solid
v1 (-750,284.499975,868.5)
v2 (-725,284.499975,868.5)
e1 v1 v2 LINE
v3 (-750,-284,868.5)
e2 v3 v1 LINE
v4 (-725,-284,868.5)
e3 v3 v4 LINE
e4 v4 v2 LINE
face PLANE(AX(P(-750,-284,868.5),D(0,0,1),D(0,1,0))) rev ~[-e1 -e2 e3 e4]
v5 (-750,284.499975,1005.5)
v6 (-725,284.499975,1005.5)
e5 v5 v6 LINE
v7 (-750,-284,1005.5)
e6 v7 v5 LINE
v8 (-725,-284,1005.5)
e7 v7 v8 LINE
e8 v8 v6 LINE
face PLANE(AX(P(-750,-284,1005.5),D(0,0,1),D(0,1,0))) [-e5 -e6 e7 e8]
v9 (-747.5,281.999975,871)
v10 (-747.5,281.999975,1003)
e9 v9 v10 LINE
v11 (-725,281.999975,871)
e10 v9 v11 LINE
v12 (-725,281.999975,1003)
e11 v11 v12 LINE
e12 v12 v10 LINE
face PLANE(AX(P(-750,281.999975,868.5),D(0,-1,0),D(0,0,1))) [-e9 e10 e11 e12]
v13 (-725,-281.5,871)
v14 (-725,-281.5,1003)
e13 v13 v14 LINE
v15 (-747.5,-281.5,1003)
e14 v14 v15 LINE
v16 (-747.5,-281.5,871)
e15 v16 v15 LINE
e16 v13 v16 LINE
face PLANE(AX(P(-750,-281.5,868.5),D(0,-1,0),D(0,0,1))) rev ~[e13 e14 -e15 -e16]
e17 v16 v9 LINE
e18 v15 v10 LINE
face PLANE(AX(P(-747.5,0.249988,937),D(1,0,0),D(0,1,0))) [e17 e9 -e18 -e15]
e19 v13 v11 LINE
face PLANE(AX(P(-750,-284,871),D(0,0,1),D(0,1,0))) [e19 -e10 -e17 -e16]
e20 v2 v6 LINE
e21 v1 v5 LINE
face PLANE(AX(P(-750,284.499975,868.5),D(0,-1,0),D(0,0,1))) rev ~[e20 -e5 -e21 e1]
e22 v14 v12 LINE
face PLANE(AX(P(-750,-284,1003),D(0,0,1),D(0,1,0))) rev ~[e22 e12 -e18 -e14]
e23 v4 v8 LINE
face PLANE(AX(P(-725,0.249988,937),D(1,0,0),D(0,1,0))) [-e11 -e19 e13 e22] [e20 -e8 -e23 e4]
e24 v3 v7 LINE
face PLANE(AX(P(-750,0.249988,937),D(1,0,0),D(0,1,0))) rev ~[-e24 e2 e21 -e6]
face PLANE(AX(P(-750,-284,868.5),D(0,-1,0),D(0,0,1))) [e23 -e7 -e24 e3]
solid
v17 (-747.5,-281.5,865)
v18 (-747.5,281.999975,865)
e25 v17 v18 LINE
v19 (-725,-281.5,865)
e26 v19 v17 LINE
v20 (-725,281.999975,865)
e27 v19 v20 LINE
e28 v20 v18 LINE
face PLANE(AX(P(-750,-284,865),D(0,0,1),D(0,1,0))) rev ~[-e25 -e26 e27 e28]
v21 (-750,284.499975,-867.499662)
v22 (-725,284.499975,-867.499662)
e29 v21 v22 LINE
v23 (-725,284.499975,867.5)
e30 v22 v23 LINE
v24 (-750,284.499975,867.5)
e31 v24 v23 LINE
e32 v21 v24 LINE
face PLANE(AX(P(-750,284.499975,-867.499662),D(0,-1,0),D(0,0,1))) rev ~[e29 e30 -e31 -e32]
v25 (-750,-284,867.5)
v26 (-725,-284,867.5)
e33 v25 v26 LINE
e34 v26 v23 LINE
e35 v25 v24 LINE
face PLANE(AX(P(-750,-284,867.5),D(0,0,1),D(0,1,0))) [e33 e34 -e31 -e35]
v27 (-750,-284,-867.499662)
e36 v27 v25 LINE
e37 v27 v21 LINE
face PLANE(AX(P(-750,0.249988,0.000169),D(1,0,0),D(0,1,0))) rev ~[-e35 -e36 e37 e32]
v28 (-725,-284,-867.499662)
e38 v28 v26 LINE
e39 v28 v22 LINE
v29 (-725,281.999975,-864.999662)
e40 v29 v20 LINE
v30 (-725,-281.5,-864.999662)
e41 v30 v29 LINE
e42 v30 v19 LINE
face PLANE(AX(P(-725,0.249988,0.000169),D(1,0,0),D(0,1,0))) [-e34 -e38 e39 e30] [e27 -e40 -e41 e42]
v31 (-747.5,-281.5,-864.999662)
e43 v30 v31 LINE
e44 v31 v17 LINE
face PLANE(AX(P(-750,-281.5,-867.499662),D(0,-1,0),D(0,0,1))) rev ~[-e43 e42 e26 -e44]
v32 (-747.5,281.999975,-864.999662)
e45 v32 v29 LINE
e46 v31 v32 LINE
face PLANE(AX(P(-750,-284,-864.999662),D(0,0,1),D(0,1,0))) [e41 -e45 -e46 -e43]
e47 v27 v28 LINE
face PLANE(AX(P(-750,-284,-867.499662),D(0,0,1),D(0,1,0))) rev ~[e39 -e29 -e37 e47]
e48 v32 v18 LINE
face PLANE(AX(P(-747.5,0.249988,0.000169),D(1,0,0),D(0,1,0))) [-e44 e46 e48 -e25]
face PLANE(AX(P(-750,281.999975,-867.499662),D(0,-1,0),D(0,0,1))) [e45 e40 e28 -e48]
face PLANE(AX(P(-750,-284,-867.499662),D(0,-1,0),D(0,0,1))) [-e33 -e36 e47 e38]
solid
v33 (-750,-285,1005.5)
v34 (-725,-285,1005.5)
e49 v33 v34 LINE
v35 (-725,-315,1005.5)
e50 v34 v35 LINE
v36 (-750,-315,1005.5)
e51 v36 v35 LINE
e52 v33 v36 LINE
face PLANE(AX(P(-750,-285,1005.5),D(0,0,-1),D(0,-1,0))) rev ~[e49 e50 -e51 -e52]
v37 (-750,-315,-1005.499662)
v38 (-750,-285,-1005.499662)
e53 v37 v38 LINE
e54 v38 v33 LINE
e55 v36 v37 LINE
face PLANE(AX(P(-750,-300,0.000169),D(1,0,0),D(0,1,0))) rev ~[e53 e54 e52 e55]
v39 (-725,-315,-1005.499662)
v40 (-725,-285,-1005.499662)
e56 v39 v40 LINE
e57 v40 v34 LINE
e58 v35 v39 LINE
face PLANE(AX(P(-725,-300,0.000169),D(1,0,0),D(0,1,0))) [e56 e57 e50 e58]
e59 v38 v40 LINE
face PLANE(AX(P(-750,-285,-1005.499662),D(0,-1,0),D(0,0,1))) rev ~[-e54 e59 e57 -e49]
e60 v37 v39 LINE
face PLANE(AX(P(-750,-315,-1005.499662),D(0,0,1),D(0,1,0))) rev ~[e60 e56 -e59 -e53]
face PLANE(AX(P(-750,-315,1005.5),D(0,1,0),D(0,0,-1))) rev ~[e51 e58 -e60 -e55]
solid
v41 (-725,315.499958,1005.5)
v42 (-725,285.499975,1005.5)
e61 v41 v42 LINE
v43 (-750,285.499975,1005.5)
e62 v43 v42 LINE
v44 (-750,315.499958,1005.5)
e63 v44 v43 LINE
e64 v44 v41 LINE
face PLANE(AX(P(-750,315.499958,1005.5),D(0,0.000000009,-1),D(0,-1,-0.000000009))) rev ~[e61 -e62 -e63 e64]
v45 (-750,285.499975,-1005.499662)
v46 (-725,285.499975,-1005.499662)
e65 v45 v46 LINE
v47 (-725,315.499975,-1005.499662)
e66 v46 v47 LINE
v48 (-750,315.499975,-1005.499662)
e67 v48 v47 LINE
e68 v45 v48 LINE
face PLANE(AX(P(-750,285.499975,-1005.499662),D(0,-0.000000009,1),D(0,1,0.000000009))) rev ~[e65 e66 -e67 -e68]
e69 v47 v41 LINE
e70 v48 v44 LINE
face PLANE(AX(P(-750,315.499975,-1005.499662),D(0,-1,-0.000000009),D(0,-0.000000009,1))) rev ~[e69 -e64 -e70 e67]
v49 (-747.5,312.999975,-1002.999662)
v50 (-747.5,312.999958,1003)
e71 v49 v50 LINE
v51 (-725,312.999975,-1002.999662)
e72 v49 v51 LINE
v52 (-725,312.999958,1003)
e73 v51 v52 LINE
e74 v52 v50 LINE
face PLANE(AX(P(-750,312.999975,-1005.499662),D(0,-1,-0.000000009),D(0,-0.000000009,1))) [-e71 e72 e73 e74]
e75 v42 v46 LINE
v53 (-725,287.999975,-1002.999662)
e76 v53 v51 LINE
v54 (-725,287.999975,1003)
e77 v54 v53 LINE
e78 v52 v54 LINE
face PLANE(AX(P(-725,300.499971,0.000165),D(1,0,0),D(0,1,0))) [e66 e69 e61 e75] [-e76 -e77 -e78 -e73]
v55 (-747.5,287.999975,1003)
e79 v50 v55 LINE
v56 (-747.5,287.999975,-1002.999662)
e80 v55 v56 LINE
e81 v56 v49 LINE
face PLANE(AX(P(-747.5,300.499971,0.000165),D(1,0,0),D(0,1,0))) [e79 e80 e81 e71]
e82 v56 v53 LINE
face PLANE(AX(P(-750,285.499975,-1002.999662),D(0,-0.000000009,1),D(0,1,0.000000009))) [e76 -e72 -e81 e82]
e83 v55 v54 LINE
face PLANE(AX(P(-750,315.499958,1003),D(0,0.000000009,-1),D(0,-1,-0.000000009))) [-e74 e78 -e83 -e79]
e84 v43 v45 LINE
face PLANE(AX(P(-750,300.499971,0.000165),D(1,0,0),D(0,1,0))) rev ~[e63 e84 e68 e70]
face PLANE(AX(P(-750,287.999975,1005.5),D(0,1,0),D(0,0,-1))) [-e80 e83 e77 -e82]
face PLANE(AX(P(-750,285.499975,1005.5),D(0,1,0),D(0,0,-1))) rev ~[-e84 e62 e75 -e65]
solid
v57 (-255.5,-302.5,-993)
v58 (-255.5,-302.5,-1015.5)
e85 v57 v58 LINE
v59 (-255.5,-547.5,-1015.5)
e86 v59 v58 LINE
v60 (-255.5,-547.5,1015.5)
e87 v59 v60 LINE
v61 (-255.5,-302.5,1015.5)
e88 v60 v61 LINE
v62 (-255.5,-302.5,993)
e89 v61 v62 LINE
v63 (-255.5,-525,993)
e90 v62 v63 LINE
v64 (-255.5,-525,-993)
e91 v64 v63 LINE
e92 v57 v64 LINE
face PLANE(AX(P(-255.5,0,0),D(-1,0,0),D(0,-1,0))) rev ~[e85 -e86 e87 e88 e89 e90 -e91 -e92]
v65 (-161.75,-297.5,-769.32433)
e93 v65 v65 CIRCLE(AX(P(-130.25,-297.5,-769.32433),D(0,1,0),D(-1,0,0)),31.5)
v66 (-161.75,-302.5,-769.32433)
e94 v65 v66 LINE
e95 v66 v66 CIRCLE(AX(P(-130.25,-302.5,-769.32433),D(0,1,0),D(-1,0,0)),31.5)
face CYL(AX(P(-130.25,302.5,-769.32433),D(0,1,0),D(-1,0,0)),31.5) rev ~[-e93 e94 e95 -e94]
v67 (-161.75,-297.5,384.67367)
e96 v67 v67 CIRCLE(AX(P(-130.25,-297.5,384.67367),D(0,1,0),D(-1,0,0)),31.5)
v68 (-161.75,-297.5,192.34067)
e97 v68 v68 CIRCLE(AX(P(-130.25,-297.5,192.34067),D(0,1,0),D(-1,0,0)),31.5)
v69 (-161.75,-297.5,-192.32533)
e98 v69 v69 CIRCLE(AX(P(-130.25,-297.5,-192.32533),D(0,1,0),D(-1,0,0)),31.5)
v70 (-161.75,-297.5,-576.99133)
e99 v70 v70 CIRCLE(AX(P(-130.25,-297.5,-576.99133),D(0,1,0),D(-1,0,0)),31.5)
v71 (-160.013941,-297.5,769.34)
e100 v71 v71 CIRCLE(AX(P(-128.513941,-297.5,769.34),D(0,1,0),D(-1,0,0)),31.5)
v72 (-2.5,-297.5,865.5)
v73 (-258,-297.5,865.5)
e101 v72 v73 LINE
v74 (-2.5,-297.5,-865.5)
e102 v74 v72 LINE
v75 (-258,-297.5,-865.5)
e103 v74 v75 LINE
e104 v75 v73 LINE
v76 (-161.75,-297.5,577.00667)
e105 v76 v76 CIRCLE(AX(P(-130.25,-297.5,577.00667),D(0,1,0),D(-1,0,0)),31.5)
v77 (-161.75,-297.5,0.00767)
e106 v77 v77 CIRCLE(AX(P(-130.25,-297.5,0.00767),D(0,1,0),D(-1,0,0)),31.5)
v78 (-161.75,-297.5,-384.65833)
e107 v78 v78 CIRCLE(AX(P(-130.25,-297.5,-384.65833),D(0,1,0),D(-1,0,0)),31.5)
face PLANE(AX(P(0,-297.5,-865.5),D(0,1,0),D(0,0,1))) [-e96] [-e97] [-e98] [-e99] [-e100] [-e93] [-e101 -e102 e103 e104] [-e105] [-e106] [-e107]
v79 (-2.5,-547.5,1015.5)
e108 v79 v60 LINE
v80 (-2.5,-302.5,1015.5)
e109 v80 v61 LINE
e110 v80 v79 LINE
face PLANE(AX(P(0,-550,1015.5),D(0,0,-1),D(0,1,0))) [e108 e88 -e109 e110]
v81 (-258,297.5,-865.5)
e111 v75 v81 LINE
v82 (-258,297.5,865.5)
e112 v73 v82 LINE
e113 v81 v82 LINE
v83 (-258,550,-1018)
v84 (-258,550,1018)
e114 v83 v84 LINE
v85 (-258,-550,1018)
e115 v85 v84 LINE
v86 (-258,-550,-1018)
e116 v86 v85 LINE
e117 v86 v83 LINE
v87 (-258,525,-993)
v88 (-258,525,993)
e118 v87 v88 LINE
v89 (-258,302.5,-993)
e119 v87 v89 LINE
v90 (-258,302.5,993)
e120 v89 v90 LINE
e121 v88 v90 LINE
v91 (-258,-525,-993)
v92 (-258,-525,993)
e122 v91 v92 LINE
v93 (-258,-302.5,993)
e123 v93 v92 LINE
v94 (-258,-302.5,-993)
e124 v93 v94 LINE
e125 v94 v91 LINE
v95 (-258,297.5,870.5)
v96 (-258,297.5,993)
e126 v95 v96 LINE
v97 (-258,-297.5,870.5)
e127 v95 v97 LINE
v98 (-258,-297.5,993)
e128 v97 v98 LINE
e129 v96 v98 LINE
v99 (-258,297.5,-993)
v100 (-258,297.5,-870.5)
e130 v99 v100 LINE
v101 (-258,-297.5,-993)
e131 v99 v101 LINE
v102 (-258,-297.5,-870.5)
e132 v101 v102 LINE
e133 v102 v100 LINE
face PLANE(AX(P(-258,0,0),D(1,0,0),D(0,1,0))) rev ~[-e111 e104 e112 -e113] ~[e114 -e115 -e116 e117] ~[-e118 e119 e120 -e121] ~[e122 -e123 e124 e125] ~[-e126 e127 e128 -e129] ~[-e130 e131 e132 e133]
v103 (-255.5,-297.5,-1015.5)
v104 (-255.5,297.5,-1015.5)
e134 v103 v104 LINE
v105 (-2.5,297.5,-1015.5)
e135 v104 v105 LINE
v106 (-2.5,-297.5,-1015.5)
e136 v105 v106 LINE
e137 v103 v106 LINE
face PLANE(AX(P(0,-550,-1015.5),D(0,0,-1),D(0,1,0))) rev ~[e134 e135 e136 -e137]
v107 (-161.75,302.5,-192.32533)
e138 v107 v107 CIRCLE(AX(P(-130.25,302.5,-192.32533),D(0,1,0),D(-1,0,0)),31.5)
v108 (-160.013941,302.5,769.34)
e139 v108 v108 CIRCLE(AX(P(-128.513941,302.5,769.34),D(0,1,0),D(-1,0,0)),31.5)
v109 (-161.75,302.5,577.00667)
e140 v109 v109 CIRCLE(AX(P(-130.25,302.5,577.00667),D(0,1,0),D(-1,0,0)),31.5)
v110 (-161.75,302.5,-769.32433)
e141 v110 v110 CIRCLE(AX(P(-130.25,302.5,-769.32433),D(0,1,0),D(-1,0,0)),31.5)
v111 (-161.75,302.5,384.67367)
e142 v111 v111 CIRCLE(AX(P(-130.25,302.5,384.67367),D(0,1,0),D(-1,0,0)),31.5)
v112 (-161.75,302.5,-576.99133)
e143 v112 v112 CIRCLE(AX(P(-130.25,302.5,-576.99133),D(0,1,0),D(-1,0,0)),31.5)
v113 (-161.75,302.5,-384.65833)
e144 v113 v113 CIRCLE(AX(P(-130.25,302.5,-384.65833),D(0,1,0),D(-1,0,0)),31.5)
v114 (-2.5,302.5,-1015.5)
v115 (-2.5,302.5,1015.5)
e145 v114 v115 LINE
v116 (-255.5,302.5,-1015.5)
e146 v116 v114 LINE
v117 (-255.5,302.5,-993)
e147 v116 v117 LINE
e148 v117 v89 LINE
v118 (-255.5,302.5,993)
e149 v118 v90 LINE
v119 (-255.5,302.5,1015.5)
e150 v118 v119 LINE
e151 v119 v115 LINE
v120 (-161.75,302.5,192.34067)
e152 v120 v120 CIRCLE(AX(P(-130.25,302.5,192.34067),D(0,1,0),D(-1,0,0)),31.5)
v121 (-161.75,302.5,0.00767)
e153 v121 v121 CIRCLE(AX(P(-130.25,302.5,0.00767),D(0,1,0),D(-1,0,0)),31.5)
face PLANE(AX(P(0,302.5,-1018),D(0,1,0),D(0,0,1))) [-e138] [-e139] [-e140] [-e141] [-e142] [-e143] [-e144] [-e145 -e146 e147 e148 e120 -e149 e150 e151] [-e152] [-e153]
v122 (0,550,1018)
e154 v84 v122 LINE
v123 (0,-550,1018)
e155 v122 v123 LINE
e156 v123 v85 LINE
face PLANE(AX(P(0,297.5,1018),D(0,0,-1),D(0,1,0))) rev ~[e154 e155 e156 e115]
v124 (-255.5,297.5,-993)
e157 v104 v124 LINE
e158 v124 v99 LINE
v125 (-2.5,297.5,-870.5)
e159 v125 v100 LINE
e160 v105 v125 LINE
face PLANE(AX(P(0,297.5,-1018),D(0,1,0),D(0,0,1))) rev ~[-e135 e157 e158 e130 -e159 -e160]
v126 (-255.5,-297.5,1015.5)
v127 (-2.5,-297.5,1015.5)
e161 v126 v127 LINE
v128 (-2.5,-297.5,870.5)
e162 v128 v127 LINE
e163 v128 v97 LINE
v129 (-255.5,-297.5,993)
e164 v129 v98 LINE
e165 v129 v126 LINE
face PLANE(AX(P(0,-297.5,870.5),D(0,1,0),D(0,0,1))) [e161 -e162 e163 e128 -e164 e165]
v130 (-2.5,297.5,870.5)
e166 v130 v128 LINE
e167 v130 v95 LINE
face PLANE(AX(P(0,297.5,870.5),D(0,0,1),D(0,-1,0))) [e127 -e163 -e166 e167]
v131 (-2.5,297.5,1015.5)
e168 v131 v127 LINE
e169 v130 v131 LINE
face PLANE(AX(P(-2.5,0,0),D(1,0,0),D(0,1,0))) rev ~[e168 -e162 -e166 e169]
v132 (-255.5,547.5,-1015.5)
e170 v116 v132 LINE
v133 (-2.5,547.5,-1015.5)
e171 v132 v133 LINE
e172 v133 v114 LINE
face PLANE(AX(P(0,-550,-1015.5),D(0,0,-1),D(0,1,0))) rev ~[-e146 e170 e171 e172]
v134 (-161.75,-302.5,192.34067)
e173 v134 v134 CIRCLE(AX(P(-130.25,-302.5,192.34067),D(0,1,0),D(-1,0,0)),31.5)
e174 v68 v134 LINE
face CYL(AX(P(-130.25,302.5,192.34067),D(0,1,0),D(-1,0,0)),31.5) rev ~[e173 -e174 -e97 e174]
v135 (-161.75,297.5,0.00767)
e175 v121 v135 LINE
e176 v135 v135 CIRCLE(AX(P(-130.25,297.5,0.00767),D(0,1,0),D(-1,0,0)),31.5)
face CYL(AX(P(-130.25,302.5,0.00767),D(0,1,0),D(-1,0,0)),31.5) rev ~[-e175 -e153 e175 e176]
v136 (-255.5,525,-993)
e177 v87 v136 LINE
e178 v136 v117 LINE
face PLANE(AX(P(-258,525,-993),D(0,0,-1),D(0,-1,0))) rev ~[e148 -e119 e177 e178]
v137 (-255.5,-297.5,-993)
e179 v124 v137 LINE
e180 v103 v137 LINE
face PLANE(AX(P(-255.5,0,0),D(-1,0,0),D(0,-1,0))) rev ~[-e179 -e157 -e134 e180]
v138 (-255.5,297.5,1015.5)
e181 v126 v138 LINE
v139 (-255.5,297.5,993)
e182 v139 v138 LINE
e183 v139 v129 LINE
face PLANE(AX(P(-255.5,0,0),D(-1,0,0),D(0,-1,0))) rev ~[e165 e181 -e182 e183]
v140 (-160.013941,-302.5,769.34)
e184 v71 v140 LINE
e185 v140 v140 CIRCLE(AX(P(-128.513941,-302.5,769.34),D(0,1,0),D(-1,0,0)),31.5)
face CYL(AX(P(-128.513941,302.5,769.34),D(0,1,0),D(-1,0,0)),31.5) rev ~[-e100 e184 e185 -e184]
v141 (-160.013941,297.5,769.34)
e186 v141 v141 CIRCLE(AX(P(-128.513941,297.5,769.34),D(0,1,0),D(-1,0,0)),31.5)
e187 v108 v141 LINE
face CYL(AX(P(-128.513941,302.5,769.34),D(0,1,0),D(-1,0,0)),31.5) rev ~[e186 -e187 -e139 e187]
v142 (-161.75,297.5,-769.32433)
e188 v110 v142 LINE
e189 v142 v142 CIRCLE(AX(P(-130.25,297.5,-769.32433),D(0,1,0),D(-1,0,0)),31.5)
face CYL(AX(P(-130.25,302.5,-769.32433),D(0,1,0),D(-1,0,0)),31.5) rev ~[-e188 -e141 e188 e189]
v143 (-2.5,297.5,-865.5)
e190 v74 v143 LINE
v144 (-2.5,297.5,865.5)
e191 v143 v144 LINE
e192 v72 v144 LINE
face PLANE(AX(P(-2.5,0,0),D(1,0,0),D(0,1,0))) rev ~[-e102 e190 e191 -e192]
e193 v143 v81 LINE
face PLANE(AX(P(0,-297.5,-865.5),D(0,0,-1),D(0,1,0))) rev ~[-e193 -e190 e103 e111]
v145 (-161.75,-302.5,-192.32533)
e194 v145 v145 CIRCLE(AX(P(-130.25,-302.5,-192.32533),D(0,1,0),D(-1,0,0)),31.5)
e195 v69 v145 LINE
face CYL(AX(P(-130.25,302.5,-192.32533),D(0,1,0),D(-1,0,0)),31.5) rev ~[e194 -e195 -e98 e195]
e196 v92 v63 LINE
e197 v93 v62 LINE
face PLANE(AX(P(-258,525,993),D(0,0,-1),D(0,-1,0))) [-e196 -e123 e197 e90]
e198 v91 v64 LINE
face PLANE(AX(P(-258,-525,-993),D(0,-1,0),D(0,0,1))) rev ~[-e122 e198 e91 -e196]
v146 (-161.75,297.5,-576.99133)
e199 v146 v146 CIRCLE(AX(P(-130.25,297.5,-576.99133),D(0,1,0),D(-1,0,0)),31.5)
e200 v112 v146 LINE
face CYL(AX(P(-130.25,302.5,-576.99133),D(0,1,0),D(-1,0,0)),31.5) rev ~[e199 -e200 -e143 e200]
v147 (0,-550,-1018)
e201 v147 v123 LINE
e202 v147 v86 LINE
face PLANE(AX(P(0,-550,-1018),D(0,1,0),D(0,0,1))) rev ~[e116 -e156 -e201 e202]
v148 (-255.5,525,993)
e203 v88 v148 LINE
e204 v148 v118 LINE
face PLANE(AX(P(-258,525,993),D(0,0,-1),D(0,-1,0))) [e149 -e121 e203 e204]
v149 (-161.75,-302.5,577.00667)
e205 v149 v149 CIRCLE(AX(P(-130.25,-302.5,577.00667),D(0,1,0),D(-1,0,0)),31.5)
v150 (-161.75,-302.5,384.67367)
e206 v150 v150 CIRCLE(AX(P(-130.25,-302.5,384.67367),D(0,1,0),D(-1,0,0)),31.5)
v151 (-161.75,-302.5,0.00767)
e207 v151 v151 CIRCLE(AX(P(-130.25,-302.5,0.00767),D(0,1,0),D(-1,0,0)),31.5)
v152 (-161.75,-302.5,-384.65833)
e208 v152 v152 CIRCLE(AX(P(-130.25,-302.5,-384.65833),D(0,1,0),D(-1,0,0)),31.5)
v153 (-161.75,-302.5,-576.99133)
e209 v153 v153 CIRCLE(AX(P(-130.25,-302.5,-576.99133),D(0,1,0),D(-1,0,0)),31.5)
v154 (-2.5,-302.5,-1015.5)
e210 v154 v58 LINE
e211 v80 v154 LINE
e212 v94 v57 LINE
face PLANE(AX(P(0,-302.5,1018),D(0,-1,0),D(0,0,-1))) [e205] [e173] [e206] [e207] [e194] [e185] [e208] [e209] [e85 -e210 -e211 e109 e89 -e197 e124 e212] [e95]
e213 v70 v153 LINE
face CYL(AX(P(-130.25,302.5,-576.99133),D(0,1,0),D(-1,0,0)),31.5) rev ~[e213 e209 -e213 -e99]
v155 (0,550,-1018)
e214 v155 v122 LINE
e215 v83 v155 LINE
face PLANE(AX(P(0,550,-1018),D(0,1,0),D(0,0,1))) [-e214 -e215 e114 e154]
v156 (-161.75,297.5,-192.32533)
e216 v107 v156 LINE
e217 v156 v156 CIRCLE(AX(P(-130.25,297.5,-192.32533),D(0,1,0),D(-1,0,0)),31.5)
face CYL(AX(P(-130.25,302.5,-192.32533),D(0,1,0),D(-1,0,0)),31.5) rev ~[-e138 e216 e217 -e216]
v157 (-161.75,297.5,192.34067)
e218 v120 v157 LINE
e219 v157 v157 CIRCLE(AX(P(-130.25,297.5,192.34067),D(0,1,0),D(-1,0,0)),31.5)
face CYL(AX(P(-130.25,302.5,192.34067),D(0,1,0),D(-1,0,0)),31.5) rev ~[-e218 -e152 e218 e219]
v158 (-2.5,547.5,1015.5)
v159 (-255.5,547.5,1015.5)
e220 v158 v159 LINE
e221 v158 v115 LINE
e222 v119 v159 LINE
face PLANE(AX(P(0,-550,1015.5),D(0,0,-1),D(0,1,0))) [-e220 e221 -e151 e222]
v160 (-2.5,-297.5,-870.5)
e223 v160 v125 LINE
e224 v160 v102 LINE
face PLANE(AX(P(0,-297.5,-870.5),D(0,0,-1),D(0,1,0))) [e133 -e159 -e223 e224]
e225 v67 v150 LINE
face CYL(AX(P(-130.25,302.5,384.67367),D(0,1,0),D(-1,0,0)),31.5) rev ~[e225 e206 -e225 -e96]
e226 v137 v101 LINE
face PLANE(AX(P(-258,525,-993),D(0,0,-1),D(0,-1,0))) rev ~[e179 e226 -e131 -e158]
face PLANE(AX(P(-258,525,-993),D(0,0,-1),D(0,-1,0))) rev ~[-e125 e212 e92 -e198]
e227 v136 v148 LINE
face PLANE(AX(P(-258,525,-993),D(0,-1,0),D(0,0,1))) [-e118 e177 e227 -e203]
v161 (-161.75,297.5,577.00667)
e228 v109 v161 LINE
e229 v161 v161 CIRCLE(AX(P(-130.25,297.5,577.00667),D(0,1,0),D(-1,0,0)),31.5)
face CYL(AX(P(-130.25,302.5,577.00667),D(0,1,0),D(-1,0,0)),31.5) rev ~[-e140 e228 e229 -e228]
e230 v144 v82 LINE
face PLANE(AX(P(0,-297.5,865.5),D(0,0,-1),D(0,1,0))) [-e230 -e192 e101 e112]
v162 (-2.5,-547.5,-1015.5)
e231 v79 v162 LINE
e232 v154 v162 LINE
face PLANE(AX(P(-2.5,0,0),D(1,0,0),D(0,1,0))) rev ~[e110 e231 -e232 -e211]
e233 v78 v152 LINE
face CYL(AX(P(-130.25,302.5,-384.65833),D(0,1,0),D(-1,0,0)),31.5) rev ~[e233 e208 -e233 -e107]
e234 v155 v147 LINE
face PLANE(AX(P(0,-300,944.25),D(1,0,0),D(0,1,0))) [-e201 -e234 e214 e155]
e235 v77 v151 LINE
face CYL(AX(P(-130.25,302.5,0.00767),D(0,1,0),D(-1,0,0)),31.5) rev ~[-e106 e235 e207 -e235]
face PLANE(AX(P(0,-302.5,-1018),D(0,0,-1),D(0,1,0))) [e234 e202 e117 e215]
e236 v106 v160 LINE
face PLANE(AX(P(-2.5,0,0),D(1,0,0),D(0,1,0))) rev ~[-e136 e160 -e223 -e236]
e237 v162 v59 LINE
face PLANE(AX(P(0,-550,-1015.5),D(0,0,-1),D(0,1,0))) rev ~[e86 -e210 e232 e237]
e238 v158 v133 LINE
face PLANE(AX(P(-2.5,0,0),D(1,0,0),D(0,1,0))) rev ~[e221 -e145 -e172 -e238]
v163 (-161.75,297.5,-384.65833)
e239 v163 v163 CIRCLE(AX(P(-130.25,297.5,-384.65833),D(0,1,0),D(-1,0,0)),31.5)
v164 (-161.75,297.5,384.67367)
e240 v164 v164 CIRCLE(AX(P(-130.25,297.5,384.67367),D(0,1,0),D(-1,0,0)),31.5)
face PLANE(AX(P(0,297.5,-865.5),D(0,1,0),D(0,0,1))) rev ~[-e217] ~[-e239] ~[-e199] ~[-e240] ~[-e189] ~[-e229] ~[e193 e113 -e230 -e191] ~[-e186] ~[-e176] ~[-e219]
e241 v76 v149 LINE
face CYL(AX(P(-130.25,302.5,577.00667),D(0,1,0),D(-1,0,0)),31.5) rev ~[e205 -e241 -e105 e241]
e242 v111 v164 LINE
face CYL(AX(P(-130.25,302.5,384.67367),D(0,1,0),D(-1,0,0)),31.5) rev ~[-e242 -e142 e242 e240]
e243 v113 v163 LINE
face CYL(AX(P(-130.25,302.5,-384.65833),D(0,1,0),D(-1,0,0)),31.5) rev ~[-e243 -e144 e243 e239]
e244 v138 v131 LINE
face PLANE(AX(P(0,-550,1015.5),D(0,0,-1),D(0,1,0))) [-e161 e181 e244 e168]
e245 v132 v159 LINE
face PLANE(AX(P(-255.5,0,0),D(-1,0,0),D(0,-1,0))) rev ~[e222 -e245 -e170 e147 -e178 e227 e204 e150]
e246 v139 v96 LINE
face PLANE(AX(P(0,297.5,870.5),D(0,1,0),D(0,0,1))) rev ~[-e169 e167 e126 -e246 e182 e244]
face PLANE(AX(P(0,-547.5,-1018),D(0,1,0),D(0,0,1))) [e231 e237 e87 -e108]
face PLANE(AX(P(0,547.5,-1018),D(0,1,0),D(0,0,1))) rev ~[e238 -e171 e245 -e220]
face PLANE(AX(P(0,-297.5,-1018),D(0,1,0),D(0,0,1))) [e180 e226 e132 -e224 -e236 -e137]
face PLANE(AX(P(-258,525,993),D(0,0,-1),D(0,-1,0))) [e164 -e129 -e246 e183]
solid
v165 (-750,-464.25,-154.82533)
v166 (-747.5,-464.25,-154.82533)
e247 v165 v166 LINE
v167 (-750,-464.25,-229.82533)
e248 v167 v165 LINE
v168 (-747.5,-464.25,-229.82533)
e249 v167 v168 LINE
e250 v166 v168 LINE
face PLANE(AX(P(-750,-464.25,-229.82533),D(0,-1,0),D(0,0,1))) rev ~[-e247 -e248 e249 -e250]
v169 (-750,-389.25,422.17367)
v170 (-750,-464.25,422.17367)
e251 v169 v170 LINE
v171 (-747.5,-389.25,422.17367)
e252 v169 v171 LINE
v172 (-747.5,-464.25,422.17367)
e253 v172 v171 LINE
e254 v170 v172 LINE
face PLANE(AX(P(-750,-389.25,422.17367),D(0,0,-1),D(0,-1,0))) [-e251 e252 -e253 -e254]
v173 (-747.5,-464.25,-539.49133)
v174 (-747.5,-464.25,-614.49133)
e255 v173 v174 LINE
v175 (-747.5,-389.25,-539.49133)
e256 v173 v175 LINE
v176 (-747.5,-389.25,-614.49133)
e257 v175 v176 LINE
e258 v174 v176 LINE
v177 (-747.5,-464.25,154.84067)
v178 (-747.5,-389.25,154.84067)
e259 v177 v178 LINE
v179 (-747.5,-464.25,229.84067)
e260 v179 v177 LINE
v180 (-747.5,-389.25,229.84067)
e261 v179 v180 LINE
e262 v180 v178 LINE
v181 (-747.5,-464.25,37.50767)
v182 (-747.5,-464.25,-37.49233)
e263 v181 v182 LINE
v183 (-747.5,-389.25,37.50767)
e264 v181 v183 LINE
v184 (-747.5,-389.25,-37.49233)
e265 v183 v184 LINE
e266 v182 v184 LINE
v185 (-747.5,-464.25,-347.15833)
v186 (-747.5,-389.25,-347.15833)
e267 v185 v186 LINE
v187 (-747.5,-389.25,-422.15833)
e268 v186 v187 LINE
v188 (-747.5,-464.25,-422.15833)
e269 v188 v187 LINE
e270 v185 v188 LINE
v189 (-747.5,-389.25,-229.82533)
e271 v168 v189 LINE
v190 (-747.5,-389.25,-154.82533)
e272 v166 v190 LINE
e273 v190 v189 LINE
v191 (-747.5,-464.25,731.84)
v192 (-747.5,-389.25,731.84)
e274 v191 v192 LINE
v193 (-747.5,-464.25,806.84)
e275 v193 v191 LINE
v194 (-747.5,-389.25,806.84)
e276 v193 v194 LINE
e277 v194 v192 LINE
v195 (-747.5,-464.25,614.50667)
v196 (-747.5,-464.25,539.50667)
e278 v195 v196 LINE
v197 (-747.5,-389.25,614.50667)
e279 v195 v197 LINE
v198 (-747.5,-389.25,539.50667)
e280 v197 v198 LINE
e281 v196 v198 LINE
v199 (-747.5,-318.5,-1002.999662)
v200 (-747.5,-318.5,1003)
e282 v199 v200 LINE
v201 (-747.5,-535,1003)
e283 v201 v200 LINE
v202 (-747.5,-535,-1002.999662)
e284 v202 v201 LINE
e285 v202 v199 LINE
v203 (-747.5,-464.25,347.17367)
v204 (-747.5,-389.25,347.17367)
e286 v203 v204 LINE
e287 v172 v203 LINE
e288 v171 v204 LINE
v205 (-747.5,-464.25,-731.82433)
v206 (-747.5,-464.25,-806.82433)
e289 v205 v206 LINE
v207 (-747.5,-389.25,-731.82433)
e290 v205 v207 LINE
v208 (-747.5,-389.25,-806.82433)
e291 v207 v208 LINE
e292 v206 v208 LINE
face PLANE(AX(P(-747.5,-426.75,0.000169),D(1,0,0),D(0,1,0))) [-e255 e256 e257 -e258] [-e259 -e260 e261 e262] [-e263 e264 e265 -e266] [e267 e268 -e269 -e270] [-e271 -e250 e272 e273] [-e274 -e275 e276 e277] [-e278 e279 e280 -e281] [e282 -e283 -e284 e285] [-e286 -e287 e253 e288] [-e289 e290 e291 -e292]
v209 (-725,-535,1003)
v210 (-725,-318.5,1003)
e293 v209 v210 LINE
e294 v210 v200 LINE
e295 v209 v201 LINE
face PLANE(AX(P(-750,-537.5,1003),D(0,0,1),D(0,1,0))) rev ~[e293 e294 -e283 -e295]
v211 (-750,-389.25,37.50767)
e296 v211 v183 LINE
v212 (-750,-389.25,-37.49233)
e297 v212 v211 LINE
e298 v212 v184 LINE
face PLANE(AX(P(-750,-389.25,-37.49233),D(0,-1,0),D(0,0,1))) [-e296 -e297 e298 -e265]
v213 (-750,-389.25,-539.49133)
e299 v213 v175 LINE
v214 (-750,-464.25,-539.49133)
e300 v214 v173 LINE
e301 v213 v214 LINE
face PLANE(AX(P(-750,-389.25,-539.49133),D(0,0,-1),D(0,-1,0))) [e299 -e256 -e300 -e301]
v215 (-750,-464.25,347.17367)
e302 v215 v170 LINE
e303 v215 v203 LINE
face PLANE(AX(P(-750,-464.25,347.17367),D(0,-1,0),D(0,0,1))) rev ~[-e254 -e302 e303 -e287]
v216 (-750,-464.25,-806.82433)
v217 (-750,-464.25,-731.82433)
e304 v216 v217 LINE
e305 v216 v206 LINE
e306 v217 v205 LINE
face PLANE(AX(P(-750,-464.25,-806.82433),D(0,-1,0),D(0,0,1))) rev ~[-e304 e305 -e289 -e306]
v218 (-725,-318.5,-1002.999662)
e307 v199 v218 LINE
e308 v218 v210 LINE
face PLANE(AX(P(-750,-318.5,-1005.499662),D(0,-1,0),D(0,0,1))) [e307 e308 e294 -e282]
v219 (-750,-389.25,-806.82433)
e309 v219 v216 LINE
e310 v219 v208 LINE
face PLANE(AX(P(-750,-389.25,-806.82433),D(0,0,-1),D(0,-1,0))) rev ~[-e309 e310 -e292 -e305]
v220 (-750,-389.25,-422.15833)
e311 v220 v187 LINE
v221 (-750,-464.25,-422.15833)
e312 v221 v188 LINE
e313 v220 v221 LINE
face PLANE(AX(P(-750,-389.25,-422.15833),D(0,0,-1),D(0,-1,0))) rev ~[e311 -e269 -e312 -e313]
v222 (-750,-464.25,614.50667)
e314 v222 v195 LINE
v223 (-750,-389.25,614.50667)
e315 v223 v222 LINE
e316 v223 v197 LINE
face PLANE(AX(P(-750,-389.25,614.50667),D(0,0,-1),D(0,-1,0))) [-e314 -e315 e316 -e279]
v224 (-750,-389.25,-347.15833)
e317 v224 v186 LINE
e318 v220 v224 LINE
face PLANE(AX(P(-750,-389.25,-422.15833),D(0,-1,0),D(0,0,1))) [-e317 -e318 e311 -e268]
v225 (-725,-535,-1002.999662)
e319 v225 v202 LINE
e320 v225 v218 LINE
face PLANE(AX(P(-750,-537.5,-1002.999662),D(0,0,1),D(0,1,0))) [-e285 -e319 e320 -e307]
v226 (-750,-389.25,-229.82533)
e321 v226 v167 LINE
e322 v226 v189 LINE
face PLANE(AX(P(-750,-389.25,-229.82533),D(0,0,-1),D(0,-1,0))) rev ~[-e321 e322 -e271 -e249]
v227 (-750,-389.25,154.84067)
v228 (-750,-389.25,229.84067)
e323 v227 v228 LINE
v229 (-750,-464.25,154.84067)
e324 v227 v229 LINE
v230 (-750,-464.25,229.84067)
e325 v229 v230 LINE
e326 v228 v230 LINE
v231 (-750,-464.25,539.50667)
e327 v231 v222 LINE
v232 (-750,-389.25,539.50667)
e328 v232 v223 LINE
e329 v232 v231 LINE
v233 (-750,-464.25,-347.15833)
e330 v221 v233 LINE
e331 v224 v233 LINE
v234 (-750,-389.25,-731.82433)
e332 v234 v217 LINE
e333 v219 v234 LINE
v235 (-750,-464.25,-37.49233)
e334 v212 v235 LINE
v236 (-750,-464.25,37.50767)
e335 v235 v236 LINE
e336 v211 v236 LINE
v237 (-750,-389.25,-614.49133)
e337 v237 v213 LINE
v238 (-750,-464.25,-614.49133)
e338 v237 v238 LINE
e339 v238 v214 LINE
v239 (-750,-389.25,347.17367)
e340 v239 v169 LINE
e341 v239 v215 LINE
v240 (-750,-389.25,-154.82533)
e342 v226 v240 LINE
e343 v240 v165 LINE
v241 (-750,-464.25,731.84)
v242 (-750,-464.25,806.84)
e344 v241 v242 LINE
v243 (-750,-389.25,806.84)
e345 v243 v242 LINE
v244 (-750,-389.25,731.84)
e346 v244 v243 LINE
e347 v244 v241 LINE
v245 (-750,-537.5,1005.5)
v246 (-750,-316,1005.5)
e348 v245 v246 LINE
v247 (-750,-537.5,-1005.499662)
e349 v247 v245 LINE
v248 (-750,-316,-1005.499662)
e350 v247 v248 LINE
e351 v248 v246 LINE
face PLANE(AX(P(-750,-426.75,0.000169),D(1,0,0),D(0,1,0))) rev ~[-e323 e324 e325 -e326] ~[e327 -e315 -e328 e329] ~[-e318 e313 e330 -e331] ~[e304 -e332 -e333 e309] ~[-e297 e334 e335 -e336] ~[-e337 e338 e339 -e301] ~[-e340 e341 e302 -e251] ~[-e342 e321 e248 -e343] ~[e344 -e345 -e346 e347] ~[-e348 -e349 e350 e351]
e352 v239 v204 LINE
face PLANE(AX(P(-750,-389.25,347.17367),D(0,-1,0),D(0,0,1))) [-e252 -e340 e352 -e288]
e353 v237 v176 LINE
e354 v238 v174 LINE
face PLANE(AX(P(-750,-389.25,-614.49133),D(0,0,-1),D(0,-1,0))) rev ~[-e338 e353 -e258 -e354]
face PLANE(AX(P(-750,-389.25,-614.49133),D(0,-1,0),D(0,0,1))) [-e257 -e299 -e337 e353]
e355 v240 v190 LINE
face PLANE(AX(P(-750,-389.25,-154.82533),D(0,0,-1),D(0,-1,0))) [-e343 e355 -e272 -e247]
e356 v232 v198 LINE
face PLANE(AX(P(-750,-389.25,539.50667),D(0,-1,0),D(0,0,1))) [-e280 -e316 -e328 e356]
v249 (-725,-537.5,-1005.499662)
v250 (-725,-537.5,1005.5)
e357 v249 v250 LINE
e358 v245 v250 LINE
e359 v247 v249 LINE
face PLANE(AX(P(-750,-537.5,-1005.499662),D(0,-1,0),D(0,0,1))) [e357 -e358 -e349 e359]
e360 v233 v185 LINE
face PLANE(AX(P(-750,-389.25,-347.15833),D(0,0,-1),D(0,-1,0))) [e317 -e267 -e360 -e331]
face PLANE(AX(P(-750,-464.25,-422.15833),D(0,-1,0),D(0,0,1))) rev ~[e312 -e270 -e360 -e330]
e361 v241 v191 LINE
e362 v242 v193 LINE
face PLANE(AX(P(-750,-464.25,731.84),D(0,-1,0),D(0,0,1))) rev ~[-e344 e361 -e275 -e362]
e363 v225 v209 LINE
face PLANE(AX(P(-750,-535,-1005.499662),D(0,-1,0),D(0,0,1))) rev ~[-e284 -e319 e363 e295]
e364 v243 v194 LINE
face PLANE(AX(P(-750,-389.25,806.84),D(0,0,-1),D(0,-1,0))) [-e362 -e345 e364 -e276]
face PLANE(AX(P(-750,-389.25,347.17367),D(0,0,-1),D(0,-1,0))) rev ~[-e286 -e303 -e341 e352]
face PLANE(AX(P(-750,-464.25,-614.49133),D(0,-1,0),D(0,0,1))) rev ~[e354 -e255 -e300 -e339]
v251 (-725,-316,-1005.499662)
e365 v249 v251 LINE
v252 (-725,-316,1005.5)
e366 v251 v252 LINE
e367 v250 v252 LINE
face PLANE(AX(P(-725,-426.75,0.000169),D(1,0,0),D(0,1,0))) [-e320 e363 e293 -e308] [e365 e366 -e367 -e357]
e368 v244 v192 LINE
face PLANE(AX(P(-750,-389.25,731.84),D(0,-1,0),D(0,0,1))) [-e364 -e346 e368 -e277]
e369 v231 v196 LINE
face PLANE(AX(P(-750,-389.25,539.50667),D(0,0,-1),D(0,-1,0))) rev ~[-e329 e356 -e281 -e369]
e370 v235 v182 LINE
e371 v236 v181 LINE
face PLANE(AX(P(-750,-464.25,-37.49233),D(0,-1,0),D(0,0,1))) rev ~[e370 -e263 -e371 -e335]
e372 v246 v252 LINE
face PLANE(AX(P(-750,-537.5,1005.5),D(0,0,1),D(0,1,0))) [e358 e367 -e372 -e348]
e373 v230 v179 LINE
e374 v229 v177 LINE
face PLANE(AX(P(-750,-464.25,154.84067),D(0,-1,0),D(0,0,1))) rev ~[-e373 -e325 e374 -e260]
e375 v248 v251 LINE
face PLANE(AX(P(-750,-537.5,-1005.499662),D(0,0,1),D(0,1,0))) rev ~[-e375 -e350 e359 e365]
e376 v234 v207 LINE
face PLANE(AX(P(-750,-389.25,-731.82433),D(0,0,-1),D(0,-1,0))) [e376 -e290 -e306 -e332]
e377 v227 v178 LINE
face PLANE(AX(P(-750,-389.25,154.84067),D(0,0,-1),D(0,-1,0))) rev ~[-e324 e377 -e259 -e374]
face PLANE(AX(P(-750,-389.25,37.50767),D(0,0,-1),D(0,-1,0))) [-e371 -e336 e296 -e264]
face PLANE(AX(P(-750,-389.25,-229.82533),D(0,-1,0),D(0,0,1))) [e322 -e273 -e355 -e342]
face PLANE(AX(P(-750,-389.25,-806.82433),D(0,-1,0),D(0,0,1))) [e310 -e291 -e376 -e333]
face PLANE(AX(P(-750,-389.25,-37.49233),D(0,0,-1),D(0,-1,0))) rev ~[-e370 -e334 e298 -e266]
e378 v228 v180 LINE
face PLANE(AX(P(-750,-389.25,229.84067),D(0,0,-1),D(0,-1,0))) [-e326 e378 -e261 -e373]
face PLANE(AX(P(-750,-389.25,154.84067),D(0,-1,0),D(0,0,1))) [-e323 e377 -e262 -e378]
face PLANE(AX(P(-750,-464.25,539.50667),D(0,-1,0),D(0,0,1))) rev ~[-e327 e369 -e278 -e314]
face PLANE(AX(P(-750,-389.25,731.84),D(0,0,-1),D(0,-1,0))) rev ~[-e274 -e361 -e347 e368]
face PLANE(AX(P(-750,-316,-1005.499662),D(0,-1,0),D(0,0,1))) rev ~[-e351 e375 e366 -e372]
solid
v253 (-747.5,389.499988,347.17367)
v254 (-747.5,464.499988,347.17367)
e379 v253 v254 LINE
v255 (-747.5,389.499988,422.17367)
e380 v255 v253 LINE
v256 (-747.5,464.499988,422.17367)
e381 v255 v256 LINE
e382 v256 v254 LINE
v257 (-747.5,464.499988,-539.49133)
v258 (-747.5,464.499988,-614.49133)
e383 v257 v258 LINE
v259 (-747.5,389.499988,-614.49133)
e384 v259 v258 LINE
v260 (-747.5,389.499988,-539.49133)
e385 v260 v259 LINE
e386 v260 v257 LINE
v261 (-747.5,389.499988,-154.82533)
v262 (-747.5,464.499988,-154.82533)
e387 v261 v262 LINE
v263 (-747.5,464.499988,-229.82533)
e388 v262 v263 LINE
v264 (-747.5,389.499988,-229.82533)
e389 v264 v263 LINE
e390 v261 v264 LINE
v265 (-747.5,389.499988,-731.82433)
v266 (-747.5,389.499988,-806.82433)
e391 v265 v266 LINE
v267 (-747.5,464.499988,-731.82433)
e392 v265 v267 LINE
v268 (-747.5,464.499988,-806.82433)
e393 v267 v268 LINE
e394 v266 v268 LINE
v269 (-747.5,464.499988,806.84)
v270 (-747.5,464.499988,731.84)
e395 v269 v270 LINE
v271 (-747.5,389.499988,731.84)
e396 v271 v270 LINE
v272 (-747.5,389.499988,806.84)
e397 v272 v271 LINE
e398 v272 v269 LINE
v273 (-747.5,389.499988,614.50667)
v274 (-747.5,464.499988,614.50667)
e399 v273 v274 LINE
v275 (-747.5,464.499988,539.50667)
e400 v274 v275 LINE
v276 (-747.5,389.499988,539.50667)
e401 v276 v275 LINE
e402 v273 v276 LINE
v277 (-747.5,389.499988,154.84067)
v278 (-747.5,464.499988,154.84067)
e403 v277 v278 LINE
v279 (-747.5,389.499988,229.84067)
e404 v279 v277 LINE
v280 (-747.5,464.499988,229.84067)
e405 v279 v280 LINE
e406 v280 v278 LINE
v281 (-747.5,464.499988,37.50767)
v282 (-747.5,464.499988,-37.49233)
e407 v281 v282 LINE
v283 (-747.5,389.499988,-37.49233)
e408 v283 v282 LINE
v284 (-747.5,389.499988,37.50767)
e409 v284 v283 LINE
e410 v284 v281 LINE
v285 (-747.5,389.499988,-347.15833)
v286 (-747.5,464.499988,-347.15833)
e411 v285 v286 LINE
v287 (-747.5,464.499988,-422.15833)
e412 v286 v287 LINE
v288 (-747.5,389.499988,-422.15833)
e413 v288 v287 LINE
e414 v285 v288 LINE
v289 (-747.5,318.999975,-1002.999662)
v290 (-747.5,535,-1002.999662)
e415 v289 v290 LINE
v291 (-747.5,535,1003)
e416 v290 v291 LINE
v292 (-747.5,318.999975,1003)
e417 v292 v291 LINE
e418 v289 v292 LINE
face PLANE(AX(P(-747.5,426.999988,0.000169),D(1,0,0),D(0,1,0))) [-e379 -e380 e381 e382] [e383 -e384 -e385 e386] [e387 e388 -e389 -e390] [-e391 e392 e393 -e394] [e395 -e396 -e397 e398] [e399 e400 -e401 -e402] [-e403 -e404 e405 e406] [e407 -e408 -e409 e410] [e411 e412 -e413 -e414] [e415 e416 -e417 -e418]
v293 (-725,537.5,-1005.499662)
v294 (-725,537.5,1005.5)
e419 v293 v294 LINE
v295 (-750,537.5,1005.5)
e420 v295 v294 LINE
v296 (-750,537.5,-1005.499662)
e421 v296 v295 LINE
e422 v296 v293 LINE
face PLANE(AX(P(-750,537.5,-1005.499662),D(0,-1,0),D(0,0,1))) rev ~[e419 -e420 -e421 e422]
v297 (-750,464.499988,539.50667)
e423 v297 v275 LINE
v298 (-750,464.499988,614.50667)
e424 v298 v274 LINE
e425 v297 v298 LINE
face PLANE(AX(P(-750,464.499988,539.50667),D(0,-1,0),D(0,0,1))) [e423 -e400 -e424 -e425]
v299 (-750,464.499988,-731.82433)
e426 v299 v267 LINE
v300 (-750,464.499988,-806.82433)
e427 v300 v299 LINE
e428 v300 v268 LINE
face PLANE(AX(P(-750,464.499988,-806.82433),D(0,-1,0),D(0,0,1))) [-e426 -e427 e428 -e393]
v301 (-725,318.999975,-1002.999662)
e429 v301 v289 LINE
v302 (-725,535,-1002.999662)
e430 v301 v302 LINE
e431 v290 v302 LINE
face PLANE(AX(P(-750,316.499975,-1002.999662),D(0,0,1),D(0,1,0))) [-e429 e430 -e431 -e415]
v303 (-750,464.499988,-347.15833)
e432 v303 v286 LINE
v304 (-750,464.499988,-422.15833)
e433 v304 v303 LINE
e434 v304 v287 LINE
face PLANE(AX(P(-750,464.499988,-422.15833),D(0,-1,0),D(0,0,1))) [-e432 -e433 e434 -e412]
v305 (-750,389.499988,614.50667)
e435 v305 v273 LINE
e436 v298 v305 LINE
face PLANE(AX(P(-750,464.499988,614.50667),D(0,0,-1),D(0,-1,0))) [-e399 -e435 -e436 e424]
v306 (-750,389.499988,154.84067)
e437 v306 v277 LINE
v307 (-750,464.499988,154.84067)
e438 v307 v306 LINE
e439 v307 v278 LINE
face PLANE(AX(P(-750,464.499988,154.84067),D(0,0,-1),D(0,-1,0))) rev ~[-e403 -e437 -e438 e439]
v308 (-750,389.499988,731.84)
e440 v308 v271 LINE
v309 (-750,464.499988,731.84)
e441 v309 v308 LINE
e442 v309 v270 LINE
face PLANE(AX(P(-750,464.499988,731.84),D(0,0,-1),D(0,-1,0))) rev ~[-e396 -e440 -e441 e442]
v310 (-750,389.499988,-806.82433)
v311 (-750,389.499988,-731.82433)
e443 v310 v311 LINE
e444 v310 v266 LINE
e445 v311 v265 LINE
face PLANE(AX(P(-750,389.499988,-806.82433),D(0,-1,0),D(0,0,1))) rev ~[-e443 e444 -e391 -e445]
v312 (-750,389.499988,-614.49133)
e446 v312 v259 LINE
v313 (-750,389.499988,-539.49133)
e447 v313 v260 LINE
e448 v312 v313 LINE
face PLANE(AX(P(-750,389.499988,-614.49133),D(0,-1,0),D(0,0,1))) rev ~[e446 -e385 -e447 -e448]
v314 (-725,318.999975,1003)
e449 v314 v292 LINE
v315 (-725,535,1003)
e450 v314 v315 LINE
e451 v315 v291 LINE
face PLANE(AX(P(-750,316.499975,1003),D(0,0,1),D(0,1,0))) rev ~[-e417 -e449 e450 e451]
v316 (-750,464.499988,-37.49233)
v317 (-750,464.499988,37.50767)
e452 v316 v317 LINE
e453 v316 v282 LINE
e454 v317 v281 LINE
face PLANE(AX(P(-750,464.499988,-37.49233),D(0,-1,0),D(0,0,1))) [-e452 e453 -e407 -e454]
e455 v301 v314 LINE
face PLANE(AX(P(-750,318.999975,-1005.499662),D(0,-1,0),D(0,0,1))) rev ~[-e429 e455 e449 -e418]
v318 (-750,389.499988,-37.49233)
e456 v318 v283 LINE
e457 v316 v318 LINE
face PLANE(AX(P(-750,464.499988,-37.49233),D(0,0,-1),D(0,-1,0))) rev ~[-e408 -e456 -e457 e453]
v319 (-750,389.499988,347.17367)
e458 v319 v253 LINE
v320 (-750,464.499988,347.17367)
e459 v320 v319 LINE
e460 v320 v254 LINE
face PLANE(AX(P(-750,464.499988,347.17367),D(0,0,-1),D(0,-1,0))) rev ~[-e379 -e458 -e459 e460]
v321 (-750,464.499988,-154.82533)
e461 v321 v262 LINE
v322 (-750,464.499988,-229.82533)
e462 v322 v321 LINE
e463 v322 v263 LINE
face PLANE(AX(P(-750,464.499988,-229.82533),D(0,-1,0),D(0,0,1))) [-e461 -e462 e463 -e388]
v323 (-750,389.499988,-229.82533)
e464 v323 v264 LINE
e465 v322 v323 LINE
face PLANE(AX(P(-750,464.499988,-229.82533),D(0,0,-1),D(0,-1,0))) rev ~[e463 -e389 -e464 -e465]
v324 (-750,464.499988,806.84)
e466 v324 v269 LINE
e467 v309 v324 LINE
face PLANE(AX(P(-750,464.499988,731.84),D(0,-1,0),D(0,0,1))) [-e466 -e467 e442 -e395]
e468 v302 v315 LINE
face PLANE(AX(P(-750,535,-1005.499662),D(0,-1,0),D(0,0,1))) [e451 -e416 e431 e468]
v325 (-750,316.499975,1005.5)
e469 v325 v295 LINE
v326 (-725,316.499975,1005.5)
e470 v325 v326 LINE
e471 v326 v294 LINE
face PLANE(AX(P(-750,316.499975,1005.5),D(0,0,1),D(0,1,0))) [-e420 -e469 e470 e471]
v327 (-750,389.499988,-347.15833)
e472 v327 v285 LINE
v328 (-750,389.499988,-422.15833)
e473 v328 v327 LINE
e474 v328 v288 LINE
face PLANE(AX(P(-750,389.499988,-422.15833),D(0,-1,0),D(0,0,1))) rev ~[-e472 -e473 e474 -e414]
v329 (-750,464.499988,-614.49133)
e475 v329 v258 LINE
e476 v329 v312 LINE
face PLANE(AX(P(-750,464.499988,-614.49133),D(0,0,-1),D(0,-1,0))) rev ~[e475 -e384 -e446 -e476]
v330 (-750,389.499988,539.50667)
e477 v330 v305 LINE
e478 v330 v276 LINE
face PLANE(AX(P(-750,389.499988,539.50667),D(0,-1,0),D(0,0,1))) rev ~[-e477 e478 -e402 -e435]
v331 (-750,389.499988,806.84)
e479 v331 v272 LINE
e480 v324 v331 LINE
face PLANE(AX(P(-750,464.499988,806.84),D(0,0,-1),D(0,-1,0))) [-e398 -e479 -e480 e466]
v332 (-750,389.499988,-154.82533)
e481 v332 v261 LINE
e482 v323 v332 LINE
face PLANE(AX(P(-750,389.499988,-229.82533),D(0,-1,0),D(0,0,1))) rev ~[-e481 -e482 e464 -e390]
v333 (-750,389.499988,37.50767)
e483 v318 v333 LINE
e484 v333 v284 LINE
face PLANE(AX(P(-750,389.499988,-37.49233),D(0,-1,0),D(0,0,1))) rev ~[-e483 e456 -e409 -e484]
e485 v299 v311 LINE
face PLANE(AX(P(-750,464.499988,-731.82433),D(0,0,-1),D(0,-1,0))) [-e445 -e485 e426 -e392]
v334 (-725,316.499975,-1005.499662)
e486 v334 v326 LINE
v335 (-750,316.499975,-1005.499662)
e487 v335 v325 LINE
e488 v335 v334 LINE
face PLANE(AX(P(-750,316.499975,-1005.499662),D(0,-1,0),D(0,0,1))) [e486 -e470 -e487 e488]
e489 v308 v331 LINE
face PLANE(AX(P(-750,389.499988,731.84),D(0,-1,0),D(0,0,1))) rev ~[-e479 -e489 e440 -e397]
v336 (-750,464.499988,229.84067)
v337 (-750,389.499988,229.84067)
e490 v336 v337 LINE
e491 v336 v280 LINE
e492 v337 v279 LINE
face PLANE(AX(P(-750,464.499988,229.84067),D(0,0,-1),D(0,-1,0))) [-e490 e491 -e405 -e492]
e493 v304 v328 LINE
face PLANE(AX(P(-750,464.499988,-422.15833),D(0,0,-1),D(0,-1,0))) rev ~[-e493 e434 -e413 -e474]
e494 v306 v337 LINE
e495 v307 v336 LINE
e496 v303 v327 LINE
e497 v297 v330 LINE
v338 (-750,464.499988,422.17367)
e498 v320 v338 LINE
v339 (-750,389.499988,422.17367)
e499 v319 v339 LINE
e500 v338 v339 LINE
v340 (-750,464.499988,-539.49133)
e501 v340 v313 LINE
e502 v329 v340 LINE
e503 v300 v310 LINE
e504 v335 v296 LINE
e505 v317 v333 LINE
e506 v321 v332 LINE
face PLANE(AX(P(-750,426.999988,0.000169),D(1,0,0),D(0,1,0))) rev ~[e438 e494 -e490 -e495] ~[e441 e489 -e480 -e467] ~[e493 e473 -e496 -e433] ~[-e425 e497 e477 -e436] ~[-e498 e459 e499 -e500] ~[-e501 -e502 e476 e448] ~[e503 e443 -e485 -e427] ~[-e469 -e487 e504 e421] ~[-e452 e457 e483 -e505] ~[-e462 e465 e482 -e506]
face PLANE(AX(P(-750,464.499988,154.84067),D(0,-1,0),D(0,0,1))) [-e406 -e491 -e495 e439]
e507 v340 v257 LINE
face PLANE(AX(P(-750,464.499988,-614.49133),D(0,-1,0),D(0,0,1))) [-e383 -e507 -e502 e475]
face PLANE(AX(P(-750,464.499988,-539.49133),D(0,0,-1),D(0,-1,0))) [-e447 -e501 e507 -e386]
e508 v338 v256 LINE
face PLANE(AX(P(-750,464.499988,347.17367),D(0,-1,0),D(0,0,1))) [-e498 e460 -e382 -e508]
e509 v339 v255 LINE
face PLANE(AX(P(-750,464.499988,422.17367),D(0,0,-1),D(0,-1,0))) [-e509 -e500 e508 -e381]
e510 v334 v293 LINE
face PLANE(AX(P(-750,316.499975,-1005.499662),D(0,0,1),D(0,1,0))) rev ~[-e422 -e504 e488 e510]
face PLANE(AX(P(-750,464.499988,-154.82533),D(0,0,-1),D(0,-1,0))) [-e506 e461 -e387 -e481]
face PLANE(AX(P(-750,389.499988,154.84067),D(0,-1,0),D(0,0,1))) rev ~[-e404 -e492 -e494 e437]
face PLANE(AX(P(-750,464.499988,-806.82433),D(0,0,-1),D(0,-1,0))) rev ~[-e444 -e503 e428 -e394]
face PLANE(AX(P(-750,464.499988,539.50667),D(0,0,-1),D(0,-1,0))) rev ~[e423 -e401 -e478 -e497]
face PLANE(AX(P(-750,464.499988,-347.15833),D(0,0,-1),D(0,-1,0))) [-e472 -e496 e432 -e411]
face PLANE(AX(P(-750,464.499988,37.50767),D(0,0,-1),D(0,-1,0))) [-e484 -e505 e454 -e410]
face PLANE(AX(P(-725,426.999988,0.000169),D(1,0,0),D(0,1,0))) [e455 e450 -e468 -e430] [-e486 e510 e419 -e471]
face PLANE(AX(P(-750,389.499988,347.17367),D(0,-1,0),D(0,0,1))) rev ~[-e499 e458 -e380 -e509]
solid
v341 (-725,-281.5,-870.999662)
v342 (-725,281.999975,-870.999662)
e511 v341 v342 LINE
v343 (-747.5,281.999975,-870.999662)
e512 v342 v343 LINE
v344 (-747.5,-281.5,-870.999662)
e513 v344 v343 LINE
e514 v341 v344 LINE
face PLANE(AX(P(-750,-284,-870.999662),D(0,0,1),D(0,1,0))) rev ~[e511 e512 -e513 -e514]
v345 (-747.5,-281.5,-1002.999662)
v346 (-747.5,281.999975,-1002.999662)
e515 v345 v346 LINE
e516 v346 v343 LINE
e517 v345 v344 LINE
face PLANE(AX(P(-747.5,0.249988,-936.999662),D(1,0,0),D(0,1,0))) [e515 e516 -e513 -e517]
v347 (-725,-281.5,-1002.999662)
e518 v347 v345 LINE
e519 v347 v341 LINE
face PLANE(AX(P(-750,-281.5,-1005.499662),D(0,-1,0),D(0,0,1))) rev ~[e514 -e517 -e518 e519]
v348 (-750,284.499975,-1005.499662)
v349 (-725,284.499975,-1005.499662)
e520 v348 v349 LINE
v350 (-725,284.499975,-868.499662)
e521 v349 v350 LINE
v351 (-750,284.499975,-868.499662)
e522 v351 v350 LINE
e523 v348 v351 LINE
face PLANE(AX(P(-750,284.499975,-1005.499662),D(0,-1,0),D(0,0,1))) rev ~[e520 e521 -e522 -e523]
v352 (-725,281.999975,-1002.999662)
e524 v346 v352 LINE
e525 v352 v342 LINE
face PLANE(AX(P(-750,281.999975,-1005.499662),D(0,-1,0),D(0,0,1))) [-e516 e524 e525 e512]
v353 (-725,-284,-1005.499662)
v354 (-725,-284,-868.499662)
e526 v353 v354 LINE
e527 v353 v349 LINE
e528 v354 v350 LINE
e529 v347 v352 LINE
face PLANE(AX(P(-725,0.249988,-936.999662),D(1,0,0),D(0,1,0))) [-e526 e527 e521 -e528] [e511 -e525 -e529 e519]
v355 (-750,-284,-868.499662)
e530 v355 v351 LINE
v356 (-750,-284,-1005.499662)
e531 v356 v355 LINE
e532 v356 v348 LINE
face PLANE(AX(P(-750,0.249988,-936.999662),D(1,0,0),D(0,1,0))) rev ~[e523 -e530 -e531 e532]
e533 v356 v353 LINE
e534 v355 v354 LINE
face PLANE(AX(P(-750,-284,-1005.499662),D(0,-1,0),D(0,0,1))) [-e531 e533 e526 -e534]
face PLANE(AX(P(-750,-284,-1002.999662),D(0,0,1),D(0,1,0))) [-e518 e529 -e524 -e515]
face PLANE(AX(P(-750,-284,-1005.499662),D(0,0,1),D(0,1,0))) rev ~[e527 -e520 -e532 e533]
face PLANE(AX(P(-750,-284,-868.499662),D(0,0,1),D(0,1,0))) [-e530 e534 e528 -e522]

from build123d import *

# Parameters (mm, degrees)
F0_W      = 1100
F0_H      = 2036
F1_DEPTH  = 258
F2_T      = -2.5
F3_W      = 5
F3_H      = 147.5
F3_H_2    = 5
F3_H_3    = 1731
F3_W_2    = 595
F4_DEPTH  = 258
F5_W      = 1100
F5_H      = 2036
F5_W_2    = 1050
F5_H_2    = 1986
F6_DEPTH  = 2.5
F7_R      = 31.5
F8_DEPTH  = 706
F11_DEPTH = 25
F10_W     = 568.4999754384
F10_H     = 137
F10_H_2   = 1734.9996622717
F10_W_2   = 221.0000246707
F10_H_3   = 2010.9996622717
F10_W_3   = 221.5
F12_T     = -2.5
F15_T     = -2.5
F15_2_T   = -2.5
F15_3_T   = -2.5
F15_4_T   = -2.5
F15_5_T   = -2.5
F13_W     = 75
F13_H     = 75
F16_DEPTH = 25
F14_W     = 75
F14_H     = 75
F17_DEPTH = 25


# Not quite as in the source:
# - a feature names something its author has since deleted; it is built from what else it names


with BuildPart() as f1:
    # F0 (on Right) → F1 (new body)
    with BuildSketch(Plane.YZ):
        Rectangle(F0_W, F0_H)
    extrude(amount=-F1_DEPTH)

    # F2
    f2_openings = [f1.faces().sort_by_distance(p)[0] for p in [
        (-258, 0, 0),
    ]]
    offset(amount=F2_T, openings=f2_openings)

    # F3 (on face) → F4 (join)
    with BuildSketch(Plane.YZ):
        with Locations((-300, 944.25)):
            Rectangle(F3_W, F3_H)
        with Locations((-300, 868)):
            Rectangle(F3_W, F3_H_2)
        with Locations((-300, 0)):
            Rectangle(F3_W, F3_H_3)
        with Locations((0, 868)):
            Rectangle(F3_W_2, F3_H_2)
        with Locations((-300, -868)):
            Rectangle(F3_W, F3_H_2)
        with Locations((300, 868)):
            Rectangle(F3_W, F3_H_2)
        with Locations((300, 944.25)):
            Rectangle(F3_W, F3_H)
        with Locations((-300, -944.25)):
            Rectangle(F3_W, F3_H)
        with Locations((0, -868)):
            Rectangle(F3_W_2, F3_H_2)
        with Locations((300, 0)):
            Rectangle(F3_W, F3_H_3)
        with Locations((300, -868)):
            Rectangle(F3_W, F3_H_2)
        with Locations((300, -944.25)):
            Rectangle(F3_W, F3_H)
    extrude(amount=-F4_DEPTH)

    # F5 (on face) → F6 (join)
    with BuildSketch(Plane(origin=(-258, 0, 0), x_dir=(0, -1, 0), z_dir=(-1, 0, 0))):
        Rectangle(F5_W, F5_H)
        Rectangle(F5_W_2, F5_H_2, mode=Mode.SUBTRACT)
    extrude(amount=-F6_DEPTH)

    # F7 (on face) → F8 (cut)
    with BuildSketch(Plane(origin=(0, 302.5, 0), x_dir=(-1, 0, 0), z_dir=(0, 1, 0))):
        with Locations((128.5139412599, 769.34)):
            Circle(F7_R)
        with Locations((130.25, 577.00667)):
            Circle(F7_R)
        with Locations((130.25, 384.67367)):
            Circle(F7_R)
        with Locations((130.25, 192.34067)):
            Circle(F7_R)
        with Locations((130.25, 0.00767)):
            Circle(F7_R)
        with Locations((130.25, -192.32533)):
            Circle(F7_R)
        with Locations((130.25, -384.65833)):
            Circle(F7_R)
        with Locations((130.25, -576.99133)):
            Circle(F7_R)
        with Locations((130.25, -769.32433)):
            Circle(F7_R)
    extrude(amount=-F8_DEPTH, mode=Mode.SUBTRACT)


with BuildPart() as f11:
    # F10 (on offset) → F11 (new body)
    with BuildSketch(Plane.YZ.offset(-750)):
        Polygon((315.4999577856, 1005.5000002704), (285.4999754384, 1005.5000000087), (285.4999754384, -1005.499662263), (315.4999753293, -1005.4996620013), align=None)
    extrude(amount=F11_DEPTH)

    # F12
    f12_openings = [f11.faces().sort_by_distance(p)[0] for p in [
        (-725, 300.499971, 7.1e-05),
    ]]
    offset(amount=F12_T, openings=f12_openings)


with BuildPart() as f11b:
    # F10 (on offset) → F11, piece 2 (new body)
    with BuildSketch(Plane.YZ.offset(-750)):
        Polygon((-285, 1005.5), (-300, 1005.5), (-315, 1005.5), (-315, -1005.4996622717), (-285, -1005.4996622717), align=None)
    extrude(amount=F11_DEPTH)


with BuildPart() as f11c:
    # F10 (on offset) → F11, piece 3 (new body)
    with BuildSketch(Plane.YZ.offset(-750)):
        with Locations((0.2499877192, 937)):
            Rectangle(F10_W, F10_H)
    extrude(amount=F11_DEPTH)

    # F15#4
    f15_4_openings = [f11c.faces().sort_by_distance(p)[0] for p in [
        (-725, 0.249988, 937),
    ]]
    offset(amount=F15_4_T, openings=f15_4_openings)


with BuildPart() as f11d:
    # F10 (on offset) → F11, piece 4 (new body)
    with BuildSketch(Plane.YZ.offset(-750)):
        with Locations((0.2499877192, -936.9996622717)):
            Rectangle(F10_W, F10_H)
    extrude(amount=F11_DEPTH)

    # F15#5
    f15_5_openings = [f11d.faces().sort_by_distance(p)[0] for p in [
        (-725, 0.249988, -936.999662),
    ]]
    offset(amount=F15_5_T, openings=f15_5_openings)


with BuildPart() as f11e:
    # F10 (on offset) → F11, piece 5 (new body)
    with BuildSketch(Plane.YZ.offset(-750)):
        with Locations((0.2499877192, 0.0001688641)):
            Rectangle(F10_W, F10_H_2)
    extrude(amount=F11_DEPTH)

    # F15#3
    f15_3_openings = [f11e.faces().sort_by_distance(p)[0] for p in [
        (-725, 0.249988, 0.000169),
    ]]
    offset(amount=F15_3_T, openings=f15_3_openings)


with BuildPart() as f11f:
    # F10 (on offset) → F11, piece 6 (new body)
    with BuildSketch(Plane.YZ.offset(-750)):
        with Locations((426.9999876647, 0.0001691346)):
            Rectangle(F10_W_2, F10_H_3)
    extrude(amount=F11_DEPTH)

    # F15
    f15_openings = [f11f.faces().sort_by_distance(p)[0] for p in [
        (-725, 426.999988, 0.000169),
    ]]
    offset(amount=F15_T, openings=f15_openings)

    # F13 (on face) → F16 (cut)
    with BuildSketch(Plane(origin=(-750, 0, 0), x_dir=(0, -1, 0), z_dir=(-1, 0, 0))):
        with Locations((-426.9999876647, -769.32433)):
            Rectangle(F13_W, F13_H)
        with Locations((-426.9999876647, -576.99133)):
            Rectangle(F13_W, F13_H)
        with Locations((-426.9999876647, -384.65833)):
            Rectangle(F13_W, F13_H)
        with Locations((-426.9999876647, -192.32533)):
            Rectangle(F13_W, F13_H)
        with Locations((-426.9999876647, 0.00767)):
            Rectangle(F13_W, F13_H)
        with Locations((-426.9999876647, 192.34067)):
            Rectangle(F13_W, F13_H)
        with Locations((-426.9999876647, 384.67367)):
            Rectangle(F13_W, F13_H)
        with Locations((-426.9999876647, 577.00667)):
            Rectangle(F13_W, F13_H)
        with Locations((-426.9999876647, 769.34)):
            Rectangle(F13_W, F13_H)
    extrude(amount=-F16_DEPTH, mode=Mode.SUBTRACT)


with BuildPart() as f11g:
    # F10 (on offset) → F11, piece 7 (new body)
    with BuildSketch(Plane.YZ.offset(-750)):
        with Locations((-426.75, 0.0001688641)):
            Rectangle(F10_W_3, F10_H_3)
    extrude(amount=F11_DEPTH)

    # F15#2
    f15_2_openings = [f11g.faces().sort_by_distance(p)[0] for p in [
        (-725, -426.75, 0.000169),
    ]]
    offset(amount=F15_2_T, openings=f15_2_openings)

    # F14 (on face) → F17 (cut)
    with BuildSketch(Plane(origin=(-750, 0, 0), x_dir=(0, -1, 0), z_dir=(-1, 0, 0))):
        with Locations((426.75, -769.32433)):
            Rectangle(F14_W, F14_H)
        with Locations((426.75, -576.99133)):
            Rectangle(F14_W, F14_H)
        with Locations((426.75, -384.65833)):
            Rectangle(F14_W, F14_H)
        with Locations((426.75, -192.32533)):
            Rectangle(F14_W, F14_H)
        with Locations((426.75, 0.00767)):
            Rectangle(F14_W, F14_H)
        with Locations((426.75, 192.34067)):
            Rectangle(F14_W, F14_H)
        with Locations((426.75, 577.00667)):
            Rectangle(F14_W, F14_H)
        with Locations((426.75, 769.34)):
            Rectangle(F14_W, F14_H)
        with Locations((426.75, 384.67367)):
            Rectangle(F14_W, F14_H)
    extrude(amount=-F17_DEPTH, mode=Mode.SUBTRACT)


solid = Compound([f1.part, f11.part, f11b.part, f11c.part, f11d.part, f11e.part, f11f.part, f11g.part])
